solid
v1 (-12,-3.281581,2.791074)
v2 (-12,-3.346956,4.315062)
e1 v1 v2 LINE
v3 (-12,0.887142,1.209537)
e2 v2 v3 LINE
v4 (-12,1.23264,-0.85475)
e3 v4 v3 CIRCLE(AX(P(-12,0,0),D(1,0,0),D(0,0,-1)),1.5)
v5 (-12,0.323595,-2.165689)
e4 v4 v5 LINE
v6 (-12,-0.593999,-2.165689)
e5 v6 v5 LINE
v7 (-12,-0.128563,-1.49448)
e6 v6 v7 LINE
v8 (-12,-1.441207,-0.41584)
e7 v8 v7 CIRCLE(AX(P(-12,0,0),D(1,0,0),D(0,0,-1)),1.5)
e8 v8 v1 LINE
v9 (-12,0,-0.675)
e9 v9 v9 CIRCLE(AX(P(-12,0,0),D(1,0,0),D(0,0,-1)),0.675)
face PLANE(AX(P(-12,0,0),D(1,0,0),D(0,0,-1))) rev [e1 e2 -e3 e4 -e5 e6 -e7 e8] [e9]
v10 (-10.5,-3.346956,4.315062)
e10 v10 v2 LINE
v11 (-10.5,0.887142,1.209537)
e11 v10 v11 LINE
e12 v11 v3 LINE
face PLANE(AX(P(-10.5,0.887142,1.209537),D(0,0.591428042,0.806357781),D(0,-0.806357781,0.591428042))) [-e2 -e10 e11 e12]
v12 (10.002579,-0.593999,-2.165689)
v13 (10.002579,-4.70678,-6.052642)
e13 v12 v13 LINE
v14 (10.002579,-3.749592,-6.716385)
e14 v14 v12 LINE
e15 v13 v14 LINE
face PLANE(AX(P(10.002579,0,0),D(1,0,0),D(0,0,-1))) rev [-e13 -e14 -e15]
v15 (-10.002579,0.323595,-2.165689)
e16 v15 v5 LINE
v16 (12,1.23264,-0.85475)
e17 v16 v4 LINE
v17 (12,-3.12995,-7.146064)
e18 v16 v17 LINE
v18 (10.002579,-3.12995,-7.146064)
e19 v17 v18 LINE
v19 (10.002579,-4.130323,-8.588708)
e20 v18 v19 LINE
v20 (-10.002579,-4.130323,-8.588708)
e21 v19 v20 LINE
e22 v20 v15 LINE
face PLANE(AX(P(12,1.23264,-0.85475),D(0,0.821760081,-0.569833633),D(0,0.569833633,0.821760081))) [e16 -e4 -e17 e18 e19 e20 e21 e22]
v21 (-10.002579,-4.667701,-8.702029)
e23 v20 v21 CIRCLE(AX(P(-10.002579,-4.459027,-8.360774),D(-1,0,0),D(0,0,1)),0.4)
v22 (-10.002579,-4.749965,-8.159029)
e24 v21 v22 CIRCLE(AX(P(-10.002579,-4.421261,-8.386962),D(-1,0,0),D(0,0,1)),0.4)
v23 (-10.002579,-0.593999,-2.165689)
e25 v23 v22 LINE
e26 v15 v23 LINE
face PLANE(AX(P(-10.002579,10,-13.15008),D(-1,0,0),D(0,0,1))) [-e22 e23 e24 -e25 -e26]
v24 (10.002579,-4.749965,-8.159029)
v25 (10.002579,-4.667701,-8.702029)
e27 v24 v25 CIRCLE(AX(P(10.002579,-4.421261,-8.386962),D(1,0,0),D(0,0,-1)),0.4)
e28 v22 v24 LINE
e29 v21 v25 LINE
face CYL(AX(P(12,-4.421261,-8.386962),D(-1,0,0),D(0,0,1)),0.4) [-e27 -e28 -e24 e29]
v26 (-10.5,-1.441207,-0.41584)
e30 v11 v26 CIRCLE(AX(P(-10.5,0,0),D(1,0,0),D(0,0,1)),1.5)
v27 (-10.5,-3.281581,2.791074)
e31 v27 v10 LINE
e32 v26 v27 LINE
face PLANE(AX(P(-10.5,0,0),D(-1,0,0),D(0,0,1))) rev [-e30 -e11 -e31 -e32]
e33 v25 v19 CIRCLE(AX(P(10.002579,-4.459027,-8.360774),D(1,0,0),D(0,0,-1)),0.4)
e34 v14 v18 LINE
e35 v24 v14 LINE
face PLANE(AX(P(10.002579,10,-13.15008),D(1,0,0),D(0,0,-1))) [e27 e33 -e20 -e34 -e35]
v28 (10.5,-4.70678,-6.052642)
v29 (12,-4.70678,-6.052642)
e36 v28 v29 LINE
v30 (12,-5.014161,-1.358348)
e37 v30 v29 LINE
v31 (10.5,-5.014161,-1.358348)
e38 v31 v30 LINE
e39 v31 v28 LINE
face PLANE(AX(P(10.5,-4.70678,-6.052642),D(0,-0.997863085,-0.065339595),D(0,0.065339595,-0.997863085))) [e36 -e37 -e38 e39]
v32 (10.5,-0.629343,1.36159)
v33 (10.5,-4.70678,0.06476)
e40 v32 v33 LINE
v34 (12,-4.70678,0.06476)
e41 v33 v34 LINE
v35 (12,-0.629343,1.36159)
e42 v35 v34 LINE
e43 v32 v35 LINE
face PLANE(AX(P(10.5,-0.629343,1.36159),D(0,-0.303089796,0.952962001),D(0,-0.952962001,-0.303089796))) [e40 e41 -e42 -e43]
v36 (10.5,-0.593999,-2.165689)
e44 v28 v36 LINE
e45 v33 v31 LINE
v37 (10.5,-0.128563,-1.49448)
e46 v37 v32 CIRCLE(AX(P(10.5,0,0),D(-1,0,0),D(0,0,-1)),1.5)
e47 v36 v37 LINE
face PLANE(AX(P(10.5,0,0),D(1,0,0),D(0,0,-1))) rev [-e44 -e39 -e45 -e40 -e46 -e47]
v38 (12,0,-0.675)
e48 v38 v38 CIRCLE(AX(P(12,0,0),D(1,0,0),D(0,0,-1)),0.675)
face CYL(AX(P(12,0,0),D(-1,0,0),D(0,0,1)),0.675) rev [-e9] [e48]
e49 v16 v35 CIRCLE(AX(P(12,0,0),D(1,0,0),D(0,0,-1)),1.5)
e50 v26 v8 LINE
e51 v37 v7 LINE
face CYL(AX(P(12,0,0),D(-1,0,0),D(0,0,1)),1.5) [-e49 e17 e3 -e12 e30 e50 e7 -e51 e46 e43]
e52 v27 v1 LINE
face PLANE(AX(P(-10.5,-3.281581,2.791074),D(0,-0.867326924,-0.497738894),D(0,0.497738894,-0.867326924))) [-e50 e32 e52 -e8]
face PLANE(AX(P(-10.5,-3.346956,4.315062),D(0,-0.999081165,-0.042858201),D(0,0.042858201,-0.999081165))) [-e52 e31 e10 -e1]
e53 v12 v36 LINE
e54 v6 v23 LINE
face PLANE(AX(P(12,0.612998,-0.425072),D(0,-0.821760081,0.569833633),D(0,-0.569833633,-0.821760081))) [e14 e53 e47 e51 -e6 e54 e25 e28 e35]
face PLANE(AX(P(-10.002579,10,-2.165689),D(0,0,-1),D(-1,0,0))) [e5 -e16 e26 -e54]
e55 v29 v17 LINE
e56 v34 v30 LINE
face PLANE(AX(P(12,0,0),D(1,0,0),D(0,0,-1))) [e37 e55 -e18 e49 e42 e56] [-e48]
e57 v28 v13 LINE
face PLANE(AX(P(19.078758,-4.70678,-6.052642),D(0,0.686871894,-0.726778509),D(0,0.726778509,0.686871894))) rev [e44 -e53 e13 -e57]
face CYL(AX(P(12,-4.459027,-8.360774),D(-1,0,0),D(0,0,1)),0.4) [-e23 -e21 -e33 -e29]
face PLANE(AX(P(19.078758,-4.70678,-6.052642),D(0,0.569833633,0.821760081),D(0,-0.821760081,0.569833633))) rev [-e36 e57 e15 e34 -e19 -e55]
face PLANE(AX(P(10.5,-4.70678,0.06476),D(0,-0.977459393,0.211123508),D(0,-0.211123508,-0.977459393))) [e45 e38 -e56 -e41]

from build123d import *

# Parameters (mm, degrees)
EXTRUDE_1_DEPTH          = 12
CUT_EXTRUDE_1_DEPTH      = 10
CUT_EXTRUDE_1_DEPTH_BACK = 10
SKETCH_2_W               = 2.506204129
SKETCH_2_H               = 10.984391515
EXTRUDE_START            = -1.5
EXTRUDE_2_DEPTH          = 1.5
FILLET_1_R               = 0.4
EXTRUDE_3_DEPTH          = 1.5
EXTRUDE_4_REACH          = 26.208


with BuildPart() as part:
    # 草图1 → 凸台-拉伸1 (new, symmetric)
    with BuildSketch(Plane(origin=(0, 0, 0), x_dir=(0, 0, -1), z_dir=(1, 0, 0))):
        with BuildLine():
            ThreePointArc((0.424459717, 1.438691749), (-1.23881175, -0.84578097), (1.494480371, -0.128562902))
            Line((1.494480371, -0.128562902), (0.897098533, 0.285679978))
            Line((0.897098533, 0.285679978), (0.611565164, 0.285679978))
            ThreePointArc((0.611565164, 0.285679978), (0.658950486, 0.146319025), (0.675, 0))
            ThreePointArc((0.675, 0), (-0.609153227, -0.290787458), (0.424459717, 0.524841832))
            Line((0.424459717, 0.524841832), (0.424459717, 1.438691749))
        make_face()
        with BuildLine():
            Line((8.48773274, -4.977898486), (8.91741162, -4.358256311))
            Line((8.91741162, -4.358256311), (0.854750449, 1.232640122))
            ThreePointArc((0.854750449, 1.232640122), (1.328932969, 0.695655923), (1.5, 0))
            ThreePointArc((1.5, 0), (1.498619458, -0.064340668), (1.494480371, -0.128562902))
            Line((1.494480371, -0.128562902), (8.48773274, -4.977898486))
        make_face()
        with BuildLine():
            ThreePointArc((1.5, 0), (1.328932969, 0.695655923), (0.854750449, 1.232640122))
            ThreePointArc((0.854750449, 1.232640122), (0.647849504, 1.352882485), (0.424459717, 1.438691749))
            Line((0.424459717, 1.438691749), (0.424459717, 0.524841832))
            ThreePointArc((0.424459717, 0.524841832), (0.531635671, 0.415918878), (0.611565164, 0.285679978))
            Line((0.611565164, 0.285679978), (0.897098533, 0.285679978))
            Line((0.897098533, 0.285679978), (1.494480371, -0.128562902))
            ThreePointArc((1.494480371, -0.128562902), (1.498619458, -0.064340668), (1.5, 0))
        make_face()
    extrude(amount=EXTRUDE_1_DEPTH, both=True)

    # 草图2 → 切除-拉伸1 (cut, two sides: drawn at the far end of the back side and taken through both)
    with BuildSketch(Plane(origin=(0, 0, 0), x_dir=(1, 0, 0), z_dir=(0, 1, 0)).offset(-CUT_EXTRUDE_1_DEPTH_BACK)):
        with Locations((-11.255680748, 7.657884592)):
            Rectangle(SKETCH_2_W, SKETCH_2_H)
        with Locations((11.255680748, 7.657884592)):
            Rectangle(SKETCH_2_W, SKETCH_2_H)
    extrude(amount=CUT_EXTRUDE_1_DEPTH + CUT_EXTRUDE_1_DEPTH_BACK, mode=Mode.SUBTRACT)

    # 草图3 → 凸台-拉伸2 (add)
    with BuildSketch(Plane.ZY.offset(12).offset(EXTRUDE_START)):
        with BuildLine():
            Line((1.209536672, 0.887142063), (4.315061937, -3.346956229))
            Line((4.315061937, -3.346956229), (2.791074167, -3.281580786))
            Line((2.791074167, -3.281580786), (-0.41583993, -1.441206839))
            ThreePointArc((-0.41583993, -1.441206839), (1.229955601, -0.858608886), (1.209536672, 0.887142063))
        make_face()
    extrude(amount=EXTRUDE_2_DEPTH)

    # 圆角1
    # the kernel refuses this fillet: 0.4 mm, written as the material it takes off along each edge
    with BuildSketch(Plane(origin=(0, -4.977898486, -8.48773274), x_dir=(0, 0.5698336328652603, 0.8217600810793743), z_dir=(-1, 0, 0)), Plane(origin=(0, -4.358256311, -8.91741162), x_dir=(0, 0.5698336328652598, 0.8217600810793746), z_dir=(1, 0, 0))) as fillet_1_piece_1:
        with BuildLine():
            CenterArc((FILLET_1_R, FILLET_1_R), FILLET_1_R, 180, 90)
            Line((0, FILLET_1_R), (0, 0))
            Line((0, 0), (FILLET_1_R, 0))
        make_face()
    extrude(amount=11.002578683, mode=Mode.SUBTRACT)
    with BuildSketch(Plane(origin=(0, -4.358256311, -8.91741162), x_dir=(0, 0.5698336328652598, 0.8217600810793746), z_dir=(-1, 0, 0)), Plane(origin=(0, -4.977898486, -8.48773274), x_dir=(0, 0.5698336328652603, 0.8217600810793743), z_dir=(1, 0, 0))) as fillet_1_piece_2:
        with BuildLine():
            CenterArc((FILLET_1_R, -FILLET_1_R), FILLET_1_R, 90, 90)
            Line((0, -FILLET_1_R), (0, 0))
            Line((0, 0), (FILLET_1_R, 0))
        make_face()
    extrude(amount=11.002578683, mode=Mode.SUBTRACT)

    # 草图4 → 凸台-拉伸3 (add)
    with BuildSketch(Plane(origin=(12, 0, 0), x_dir=(0, 0, -1), z_dir=(1, 0, 0))):
        with BuildLine():
            Line((-1.361590085, -0.629342864), (-0.064760058, -4.70678049))
            Line((-0.064760058, -4.70678049), (1.358347945, -5.014160577))
            Line((1.358347945, -5.014160577), (6.052641572, -4.70678049))
            Line((6.052641572, -4.70678049), (2.165688834, -0.593999427))
            Line((2.165688834, -0.593999427), (1.494480371, -0.128562902))
            ThreePointArc((1.494480371, -0.128562902), (0.259056171, -1.477460626), (-1.361590085, -0.629342864))
        make_face()
    extrude(amount=-EXTRUDE_3_DEPTH)

    # 凸台-拉伸4: up to this face of the body (flat: up to its plane)
    extrude_4_end = Plane(part.part.faces().sort_by_distance((12, -3.083366952, -2.010931635))[0])
    # 草图5 → 凸台-拉伸4 (add, up to the picked face)
    with BuildSketch(Plane(origin=(10.002578683, 0, 0), x_dir=(0, 0, -1), z_dir=(1, 0, 0)), mode=Mode.PRIVATE) as extrude_4_sk1:
        Polygon((6.052641572, -4.70678049), (2.165688834, -0.593999427), (2.165688834, 0.323595257), (7.146064321, -3.129949789), align=None)
    extrude_4_tool1 = split(extrude(extrude_4_sk1.sketch, amount=EXTRUDE_4_REACH, mode=Mode.PRIVATE), bisect_by=extrude_4_end, keep=Keep.BOTH, mode=Mode.PRIVATE)
    add(extrude_4_tool1.solids().sort_by(Axis((10.002579, -2.305975, -4.731819), (1, 0, 0)))[0])


solid = part.part
